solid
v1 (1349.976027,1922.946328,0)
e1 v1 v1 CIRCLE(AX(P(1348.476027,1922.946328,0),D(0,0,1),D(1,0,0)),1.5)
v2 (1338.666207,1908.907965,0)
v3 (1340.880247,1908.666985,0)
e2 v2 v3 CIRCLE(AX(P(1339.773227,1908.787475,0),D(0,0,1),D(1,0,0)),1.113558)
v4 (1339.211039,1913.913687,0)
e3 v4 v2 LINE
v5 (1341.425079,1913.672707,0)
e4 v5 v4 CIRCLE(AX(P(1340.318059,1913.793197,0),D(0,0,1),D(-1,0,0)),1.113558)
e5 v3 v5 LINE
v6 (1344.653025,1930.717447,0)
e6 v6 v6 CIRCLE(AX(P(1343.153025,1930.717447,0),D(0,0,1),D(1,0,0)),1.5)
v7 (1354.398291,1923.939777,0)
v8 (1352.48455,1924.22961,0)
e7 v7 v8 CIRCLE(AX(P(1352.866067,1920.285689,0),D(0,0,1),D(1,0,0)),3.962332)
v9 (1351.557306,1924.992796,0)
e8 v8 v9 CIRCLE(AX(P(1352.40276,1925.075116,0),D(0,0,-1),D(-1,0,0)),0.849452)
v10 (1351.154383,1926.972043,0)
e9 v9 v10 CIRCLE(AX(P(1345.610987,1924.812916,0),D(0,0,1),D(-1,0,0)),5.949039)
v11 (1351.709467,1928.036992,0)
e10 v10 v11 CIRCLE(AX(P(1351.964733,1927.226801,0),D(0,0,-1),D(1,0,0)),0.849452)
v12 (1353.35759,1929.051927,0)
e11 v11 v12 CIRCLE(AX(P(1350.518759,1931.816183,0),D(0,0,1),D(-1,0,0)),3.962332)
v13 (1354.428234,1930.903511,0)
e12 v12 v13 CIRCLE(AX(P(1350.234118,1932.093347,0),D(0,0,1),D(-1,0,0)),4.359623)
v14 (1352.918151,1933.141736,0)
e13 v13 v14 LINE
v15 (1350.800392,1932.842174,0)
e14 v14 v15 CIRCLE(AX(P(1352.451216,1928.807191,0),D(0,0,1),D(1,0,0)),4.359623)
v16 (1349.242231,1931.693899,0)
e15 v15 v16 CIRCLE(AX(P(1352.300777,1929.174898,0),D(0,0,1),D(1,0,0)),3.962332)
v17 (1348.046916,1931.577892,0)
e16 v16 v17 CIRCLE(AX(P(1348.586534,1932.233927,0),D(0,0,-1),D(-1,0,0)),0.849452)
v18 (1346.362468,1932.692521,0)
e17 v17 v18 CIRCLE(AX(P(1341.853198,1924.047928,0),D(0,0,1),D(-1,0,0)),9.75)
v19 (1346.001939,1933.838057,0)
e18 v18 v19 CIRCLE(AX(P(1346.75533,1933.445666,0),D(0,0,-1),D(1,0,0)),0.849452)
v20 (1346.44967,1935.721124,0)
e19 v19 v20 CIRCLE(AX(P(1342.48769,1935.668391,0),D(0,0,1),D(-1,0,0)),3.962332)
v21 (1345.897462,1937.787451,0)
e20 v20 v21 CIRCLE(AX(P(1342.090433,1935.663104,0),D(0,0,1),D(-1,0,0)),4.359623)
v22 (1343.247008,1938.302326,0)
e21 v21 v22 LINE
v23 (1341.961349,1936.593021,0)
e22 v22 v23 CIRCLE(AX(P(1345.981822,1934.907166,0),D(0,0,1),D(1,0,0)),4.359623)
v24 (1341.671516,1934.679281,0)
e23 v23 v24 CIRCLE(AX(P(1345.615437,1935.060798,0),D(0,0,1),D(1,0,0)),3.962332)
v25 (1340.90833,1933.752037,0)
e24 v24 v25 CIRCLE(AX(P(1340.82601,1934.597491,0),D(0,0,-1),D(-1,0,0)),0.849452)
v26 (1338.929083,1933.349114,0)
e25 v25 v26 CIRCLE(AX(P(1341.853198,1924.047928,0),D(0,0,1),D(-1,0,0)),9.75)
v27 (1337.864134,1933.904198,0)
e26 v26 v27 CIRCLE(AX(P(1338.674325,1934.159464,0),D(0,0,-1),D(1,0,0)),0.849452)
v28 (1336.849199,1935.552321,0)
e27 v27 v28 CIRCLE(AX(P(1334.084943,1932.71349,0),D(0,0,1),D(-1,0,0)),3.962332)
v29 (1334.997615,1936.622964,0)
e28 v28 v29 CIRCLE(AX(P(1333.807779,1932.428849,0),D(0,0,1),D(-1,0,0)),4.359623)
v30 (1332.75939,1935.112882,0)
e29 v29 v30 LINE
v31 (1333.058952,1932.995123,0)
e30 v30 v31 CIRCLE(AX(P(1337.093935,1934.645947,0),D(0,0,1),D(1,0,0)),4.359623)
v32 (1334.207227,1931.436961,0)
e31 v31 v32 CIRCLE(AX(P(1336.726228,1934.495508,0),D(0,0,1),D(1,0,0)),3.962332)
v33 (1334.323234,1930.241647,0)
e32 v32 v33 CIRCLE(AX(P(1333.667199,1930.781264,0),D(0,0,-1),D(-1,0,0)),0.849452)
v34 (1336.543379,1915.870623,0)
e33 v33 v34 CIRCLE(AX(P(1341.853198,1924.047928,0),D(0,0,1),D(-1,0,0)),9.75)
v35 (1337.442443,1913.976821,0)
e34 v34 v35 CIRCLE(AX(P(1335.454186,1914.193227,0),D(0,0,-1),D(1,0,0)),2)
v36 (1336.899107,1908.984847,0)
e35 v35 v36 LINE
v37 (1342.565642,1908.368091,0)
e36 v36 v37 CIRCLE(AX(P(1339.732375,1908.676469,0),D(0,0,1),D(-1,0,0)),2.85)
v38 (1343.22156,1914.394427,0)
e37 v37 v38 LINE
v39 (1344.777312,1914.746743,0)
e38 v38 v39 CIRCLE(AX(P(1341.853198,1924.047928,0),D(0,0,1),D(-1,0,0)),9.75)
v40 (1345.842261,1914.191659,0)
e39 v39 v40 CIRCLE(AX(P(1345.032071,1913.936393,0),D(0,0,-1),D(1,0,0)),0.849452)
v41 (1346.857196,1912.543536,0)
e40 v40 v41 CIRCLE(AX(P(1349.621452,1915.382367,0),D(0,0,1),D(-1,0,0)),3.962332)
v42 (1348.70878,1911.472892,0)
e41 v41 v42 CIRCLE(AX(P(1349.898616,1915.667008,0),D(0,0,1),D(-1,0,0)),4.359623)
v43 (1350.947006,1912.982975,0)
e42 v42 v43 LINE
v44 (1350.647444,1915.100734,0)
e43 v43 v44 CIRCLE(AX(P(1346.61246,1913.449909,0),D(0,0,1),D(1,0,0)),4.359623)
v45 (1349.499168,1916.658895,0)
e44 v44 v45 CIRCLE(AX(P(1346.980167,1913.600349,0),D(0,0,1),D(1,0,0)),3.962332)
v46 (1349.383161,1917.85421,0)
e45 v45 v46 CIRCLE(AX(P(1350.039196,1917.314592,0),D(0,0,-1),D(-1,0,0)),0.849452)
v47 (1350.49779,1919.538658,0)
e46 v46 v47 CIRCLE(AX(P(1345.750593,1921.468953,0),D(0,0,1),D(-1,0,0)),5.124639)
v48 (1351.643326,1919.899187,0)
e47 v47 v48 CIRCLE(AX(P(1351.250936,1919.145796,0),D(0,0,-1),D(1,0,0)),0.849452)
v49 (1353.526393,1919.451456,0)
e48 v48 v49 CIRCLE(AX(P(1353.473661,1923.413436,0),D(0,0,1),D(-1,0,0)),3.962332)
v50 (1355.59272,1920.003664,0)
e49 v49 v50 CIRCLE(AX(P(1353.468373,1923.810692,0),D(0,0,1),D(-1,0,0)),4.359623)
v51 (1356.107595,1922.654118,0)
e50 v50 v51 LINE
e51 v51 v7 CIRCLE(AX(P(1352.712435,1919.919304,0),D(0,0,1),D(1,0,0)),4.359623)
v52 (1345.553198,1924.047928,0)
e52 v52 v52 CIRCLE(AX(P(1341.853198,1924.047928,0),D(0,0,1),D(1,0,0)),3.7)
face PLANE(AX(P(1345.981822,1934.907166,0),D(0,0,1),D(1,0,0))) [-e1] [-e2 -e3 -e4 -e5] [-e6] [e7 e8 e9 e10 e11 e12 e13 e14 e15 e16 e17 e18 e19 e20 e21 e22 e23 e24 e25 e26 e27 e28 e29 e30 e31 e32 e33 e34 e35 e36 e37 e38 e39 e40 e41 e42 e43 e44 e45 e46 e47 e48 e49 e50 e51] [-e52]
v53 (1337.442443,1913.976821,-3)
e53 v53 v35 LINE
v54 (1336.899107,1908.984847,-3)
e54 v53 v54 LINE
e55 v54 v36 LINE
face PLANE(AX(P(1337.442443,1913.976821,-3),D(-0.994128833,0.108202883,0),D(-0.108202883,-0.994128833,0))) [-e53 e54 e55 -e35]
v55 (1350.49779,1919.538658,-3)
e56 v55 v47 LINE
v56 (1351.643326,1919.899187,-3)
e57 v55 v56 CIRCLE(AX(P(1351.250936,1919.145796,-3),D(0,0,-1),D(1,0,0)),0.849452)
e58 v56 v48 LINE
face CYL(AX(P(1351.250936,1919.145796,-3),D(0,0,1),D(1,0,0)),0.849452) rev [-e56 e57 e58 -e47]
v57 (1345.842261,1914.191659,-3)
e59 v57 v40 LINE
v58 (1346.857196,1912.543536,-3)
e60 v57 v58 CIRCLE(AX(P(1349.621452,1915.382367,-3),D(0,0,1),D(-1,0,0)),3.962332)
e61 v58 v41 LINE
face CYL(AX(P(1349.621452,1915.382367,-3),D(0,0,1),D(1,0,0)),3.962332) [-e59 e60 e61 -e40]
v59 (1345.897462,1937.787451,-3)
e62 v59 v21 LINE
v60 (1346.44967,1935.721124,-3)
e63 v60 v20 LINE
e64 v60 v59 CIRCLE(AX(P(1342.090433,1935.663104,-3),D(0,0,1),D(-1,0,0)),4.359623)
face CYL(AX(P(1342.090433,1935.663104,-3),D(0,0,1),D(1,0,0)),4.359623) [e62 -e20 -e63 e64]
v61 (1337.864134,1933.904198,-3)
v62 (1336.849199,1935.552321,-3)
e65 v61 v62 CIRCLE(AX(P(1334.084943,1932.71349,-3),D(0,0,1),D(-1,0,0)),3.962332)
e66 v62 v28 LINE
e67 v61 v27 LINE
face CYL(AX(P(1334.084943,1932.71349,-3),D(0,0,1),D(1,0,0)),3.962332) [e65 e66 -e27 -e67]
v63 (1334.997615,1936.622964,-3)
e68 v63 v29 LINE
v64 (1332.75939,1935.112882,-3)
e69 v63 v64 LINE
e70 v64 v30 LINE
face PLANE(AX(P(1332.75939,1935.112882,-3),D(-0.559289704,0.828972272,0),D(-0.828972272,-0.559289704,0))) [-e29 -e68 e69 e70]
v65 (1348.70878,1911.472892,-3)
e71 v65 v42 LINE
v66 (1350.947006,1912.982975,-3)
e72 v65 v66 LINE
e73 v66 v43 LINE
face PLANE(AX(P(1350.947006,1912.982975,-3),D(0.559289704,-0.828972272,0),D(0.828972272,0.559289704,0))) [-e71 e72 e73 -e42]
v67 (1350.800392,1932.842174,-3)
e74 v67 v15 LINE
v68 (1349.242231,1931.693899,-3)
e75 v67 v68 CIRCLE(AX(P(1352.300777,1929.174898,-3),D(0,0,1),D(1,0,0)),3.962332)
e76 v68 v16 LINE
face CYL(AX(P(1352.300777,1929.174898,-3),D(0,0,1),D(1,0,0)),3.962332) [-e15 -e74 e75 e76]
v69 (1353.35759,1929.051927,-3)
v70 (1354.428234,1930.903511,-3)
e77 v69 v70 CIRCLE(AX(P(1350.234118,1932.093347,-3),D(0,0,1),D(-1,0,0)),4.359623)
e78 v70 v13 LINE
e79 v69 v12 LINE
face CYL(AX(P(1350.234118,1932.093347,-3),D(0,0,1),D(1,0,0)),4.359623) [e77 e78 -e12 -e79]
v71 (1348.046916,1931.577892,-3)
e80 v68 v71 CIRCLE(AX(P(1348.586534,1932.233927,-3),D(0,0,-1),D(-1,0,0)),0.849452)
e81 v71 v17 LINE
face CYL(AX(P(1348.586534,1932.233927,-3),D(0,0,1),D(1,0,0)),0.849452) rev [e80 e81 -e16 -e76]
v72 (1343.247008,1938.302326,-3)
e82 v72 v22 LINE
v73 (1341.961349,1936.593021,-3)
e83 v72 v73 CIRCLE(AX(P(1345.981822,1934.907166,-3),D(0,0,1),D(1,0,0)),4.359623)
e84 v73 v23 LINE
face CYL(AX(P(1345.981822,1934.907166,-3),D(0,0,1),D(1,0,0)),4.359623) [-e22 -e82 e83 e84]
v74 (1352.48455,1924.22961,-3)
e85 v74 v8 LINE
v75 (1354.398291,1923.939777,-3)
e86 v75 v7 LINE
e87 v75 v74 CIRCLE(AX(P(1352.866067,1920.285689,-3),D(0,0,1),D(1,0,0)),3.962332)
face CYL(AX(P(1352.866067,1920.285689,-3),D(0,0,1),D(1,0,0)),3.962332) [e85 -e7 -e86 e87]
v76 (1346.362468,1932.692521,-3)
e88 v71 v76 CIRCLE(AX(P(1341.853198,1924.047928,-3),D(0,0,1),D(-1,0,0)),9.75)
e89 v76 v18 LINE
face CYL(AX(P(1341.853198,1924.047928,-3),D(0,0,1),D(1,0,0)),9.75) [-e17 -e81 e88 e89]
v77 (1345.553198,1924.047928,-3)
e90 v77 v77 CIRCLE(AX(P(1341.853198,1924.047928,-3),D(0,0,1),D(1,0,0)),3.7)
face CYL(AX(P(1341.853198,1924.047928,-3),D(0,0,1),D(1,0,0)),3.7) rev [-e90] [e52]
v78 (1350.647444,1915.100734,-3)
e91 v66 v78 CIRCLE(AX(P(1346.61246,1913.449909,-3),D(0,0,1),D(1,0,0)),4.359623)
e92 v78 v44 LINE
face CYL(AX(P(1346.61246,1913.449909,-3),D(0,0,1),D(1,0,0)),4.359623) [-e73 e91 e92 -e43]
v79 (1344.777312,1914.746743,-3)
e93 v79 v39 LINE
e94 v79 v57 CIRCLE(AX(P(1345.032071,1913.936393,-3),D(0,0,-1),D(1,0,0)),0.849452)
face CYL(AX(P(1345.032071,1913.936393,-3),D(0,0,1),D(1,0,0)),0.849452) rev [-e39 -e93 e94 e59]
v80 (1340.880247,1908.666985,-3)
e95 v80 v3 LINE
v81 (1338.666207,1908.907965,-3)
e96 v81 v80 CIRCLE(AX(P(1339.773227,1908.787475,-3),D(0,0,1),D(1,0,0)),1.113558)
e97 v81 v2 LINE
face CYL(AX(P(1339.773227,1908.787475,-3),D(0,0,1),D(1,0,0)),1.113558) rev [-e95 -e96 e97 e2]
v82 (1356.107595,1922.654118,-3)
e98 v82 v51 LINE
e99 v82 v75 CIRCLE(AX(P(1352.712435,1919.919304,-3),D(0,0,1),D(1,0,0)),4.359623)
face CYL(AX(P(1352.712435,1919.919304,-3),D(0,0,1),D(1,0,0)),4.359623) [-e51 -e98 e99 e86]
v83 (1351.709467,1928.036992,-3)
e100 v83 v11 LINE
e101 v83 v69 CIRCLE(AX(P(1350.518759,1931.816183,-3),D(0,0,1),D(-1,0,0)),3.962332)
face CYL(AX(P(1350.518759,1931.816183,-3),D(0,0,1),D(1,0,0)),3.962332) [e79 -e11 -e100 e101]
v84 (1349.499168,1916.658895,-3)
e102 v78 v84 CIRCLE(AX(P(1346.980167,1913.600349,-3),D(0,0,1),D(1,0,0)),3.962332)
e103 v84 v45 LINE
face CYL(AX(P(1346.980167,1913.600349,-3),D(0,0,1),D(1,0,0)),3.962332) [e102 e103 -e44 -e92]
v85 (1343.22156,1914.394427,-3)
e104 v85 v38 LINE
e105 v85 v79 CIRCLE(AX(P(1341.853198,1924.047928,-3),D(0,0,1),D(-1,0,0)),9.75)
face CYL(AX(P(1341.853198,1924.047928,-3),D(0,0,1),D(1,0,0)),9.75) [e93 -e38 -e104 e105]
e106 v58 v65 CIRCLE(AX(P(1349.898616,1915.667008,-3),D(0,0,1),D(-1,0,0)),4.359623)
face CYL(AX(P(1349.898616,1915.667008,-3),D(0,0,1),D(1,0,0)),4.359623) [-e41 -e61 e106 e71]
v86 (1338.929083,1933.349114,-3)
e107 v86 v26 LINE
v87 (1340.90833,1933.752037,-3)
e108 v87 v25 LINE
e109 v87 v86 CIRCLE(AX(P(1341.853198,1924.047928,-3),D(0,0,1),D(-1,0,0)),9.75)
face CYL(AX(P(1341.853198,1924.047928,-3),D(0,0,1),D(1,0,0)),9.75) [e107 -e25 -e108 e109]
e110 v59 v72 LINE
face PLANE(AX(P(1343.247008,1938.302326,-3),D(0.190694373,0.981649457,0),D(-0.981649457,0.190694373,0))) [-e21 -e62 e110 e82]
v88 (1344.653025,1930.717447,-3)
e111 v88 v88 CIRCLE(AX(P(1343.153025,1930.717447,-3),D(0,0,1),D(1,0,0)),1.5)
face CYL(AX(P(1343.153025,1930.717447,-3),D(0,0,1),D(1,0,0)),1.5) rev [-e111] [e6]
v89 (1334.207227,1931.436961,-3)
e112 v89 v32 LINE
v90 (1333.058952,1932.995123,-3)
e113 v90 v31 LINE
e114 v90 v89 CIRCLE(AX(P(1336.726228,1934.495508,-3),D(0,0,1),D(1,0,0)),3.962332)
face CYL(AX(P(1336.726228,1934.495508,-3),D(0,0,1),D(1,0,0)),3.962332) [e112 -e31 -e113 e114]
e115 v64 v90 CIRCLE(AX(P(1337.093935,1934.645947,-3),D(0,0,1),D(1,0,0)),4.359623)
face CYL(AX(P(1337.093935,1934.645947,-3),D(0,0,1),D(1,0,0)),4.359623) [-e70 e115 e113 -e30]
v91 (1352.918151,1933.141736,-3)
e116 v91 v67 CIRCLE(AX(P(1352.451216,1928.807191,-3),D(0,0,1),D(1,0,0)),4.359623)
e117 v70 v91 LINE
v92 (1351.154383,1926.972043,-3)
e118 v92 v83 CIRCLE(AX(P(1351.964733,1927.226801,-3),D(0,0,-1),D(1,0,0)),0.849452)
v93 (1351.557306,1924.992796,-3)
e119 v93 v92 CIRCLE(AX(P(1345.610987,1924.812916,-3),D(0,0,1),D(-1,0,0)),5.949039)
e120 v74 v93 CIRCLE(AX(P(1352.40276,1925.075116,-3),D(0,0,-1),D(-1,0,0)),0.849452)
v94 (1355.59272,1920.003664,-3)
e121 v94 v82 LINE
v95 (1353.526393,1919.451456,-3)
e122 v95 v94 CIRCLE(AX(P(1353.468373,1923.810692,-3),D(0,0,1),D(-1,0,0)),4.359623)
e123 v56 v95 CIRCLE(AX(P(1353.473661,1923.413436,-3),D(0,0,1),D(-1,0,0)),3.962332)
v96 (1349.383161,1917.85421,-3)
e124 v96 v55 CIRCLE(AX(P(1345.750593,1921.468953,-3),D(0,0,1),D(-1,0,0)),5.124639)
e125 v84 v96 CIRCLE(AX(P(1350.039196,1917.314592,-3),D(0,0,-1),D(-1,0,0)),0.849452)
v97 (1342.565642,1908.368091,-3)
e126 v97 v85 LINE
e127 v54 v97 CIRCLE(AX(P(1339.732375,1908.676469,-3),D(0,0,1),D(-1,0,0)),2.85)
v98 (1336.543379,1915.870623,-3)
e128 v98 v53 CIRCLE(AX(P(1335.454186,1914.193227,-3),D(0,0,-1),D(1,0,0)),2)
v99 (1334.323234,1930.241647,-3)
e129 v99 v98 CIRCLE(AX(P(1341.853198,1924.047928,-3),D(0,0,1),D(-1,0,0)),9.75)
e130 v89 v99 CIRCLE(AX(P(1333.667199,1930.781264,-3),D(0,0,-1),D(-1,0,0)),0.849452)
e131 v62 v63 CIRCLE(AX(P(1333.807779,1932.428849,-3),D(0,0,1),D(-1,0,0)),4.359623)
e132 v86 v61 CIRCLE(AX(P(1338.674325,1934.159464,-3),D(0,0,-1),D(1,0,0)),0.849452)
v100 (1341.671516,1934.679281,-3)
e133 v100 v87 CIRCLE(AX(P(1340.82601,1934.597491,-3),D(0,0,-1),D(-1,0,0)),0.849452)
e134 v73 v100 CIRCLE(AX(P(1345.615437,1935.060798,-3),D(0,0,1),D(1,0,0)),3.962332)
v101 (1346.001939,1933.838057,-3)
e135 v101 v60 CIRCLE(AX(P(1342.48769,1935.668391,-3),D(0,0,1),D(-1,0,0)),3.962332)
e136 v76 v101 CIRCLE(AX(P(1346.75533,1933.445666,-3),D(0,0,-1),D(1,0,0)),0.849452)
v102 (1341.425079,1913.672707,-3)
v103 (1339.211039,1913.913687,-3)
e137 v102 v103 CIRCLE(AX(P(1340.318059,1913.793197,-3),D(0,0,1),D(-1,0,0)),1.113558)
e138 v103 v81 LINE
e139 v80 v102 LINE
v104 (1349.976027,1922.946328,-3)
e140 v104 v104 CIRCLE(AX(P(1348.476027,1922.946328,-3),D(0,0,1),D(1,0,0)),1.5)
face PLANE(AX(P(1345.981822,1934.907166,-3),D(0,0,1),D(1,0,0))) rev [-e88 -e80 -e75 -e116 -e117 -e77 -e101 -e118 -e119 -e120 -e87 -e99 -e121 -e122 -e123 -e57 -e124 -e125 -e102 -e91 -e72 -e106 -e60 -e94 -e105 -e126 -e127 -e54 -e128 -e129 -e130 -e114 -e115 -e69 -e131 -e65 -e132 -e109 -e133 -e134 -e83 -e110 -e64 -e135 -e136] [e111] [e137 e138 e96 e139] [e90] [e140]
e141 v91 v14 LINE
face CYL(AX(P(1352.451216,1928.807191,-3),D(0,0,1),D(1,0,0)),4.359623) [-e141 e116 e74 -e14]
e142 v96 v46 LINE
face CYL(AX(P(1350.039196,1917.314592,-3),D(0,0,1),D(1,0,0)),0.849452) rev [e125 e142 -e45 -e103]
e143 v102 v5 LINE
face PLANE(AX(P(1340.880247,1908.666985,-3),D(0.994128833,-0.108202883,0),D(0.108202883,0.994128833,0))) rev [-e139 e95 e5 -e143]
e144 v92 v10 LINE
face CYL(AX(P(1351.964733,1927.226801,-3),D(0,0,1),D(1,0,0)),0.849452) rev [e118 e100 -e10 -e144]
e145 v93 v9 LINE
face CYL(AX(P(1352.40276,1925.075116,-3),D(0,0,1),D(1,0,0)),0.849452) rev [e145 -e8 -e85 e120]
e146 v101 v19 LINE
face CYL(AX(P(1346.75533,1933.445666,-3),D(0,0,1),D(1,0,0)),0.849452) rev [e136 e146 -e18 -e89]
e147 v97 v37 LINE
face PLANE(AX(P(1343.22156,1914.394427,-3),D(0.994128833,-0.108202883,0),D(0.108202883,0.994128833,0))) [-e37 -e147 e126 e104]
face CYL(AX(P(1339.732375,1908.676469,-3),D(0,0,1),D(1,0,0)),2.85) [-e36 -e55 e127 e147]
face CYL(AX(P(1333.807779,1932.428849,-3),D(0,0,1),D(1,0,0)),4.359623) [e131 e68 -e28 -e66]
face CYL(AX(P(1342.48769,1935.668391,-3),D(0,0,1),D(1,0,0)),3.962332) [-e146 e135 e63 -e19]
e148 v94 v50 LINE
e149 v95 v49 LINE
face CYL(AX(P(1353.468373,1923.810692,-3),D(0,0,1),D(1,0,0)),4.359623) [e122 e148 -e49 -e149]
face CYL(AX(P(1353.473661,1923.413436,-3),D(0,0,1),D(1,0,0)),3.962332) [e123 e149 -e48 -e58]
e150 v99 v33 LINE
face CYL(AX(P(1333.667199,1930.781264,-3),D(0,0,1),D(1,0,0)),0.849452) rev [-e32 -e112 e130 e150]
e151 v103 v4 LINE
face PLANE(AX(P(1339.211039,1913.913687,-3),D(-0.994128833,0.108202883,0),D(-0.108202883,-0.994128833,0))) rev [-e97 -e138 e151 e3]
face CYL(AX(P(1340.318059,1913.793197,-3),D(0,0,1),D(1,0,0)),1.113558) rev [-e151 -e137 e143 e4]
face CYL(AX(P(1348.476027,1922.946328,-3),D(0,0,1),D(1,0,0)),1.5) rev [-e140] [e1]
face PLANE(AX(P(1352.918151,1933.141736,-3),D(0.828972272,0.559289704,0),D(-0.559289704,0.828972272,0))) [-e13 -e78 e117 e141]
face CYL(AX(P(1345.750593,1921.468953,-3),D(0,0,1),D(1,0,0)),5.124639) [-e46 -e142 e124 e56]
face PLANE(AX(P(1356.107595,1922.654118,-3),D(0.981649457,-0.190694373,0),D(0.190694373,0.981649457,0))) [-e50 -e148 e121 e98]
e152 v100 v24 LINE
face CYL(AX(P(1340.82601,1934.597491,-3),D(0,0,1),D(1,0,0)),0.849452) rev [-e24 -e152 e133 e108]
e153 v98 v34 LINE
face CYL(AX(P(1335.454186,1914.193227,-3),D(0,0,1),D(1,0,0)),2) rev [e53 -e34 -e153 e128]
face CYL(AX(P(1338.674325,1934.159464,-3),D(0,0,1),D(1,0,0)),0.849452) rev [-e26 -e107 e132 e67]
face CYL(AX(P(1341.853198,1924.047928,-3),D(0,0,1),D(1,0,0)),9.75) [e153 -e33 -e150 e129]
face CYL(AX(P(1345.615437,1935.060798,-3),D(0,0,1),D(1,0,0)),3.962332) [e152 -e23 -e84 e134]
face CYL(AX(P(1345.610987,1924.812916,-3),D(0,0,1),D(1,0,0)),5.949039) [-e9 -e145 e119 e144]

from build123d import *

# Parameters (mm, degrees)
ESQUISSE1_R               = 3.7
ESQUISSE1_R_2             = 1.5
T_LE_DE_BASE_PLI_E1_DEPTH = 3


# Sheet-metal steps are written as plain solids
with BuildPart() as part:
    # Esquisse1 → Tôle de base pliée1 (new body)
    with BuildSketch(Plane.XY):
        with BuildLine():
            Line((1343.247008076, 1938.302325501), (1345.89746161, 1937.787450694))
            ThreePointArc((1345.89746161, 1937.787450694), (1346.302249899, 1936.788677026), (1346.449670341, 1935.72112393))
            ThreePointArc((1346.449670341, 1935.72112393), (1346.342555269, 1934.751830987), (1346.001938932, 1933.838056967))
            ThreePointArc((1346.001938932, 1933.838056967), (1345.945060229, 1933.190654063), (1346.362467863, 1932.692520976))
            ThreePointArc((1346.362467863, 1932.692520976), (1347.233633787, 1932.178943437), (1348.046916436, 1931.57789162))
            ThreePointArc((1348.046916436, 1931.57789162), (1348.668588775, 1931.388447146), (1349.242230693, 1931.693898708))
            ThreePointArc((1349.242230693, 1931.693898708), (1349.950118086, 1932.364642987), (1350.800392256, 1932.842174436))
            ThreePointArc((1350.800392256, 1932.842174436), (1351.840616067, 1933.123842365), (1352.918151311, 1933.141736383))
            Line((1352.918151311, 1933.141736383), (1354.428233511, 1930.903511249))
            ThreePointArc((1354.428233511, 1930.903511249), (1354.008222422, 1929.911043071), (1353.357590382, 1929.051927044))
            ThreePointArc((1353.357590382, 1929.051927044), (1352.596454976, 1928.442275224), (1351.709467048, 1928.03699154))
            ThreePointArc((1351.709467048, 1928.03699154), (1351.211464748, 1927.619427873), (1351.154383232, 1926.97204282))
            ThreePointArc((1351.154383232, 1926.97204282), (1351.440459119, 1925.999644606), (1351.557306264, 1924.992795836))
            ThreePointArc((1351.557306264, 1924.992795836), (1351.862937519, 1924.419249637), (1352.48455048, 1924.229610418))
            ThreePointArc((1352.48455048, 1924.229610418), (1353.459390284, 1924.203346271), (1354.398290641, 1923.939777365))
            ThreePointArc((1354.398290641, 1923.939777365), (1355.333009255, 1923.403397357), (1356.107594714, 1922.65411786))
            Line((1356.107594714, 1922.65411786), (1355.592719908, 1920.003664327))
            ThreePointArc((1355.592719908, 1920.003664327), (1354.59394624, 1919.598876037), (1353.526393144, 1919.451455596))
            ThreePointArc((1353.526393144, 1919.451455596), (1352.557100201, 1919.558570667), (1351.643326181, 1919.899187005))
            ThreePointArc((1351.643326181, 1919.899187005), (1350.995923277, 1919.956065707), (1350.497790189, 1919.538658073))
            ThreePointArc((1350.497790189, 1919.538658073), (1350.024286618, 1918.640974498), (1349.383160833, 1917.854209501))
            ThreePointArc((1349.383160833, 1917.854209501), (1349.19371636, 1917.232537161), (1349.499167922, 1916.658895244))
            ThreePointArc((1349.499167922, 1916.658895244), (1350.169912201, 1915.951007851), (1350.64744365, 1915.100733681))
            ThreePointArc((1350.64744365, 1915.100733681), (1350.929111579, 1914.06050987), (1350.947005597, 1912.982974625))
            Line((1350.947005597, 1912.982974625), (1348.708780463, 1911.472892426))
            ThreePointArc((1348.708780463, 1911.472892426), (1347.716312285, 1911.892903515), (1346.857196258, 1912.543535554))
            ThreePointArc((1346.857196258, 1912.543535554), (1346.247544438, 1913.304670961), (1345.842260754, 1914.191658889))
            ThreePointArc((1345.842260754, 1914.191658889), (1345.424697087, 1914.689661189), (1344.777312034, 1914.746742704))
            ThreePointArc((1344.777312034, 1914.746742704), (1344.006653047, 1914.538715485), (1343.221559749, 1914.394427185))
            Line((1343.221559749, 1914.394427185), (1342.565641761, 1908.368090699))
            ThreePointArc((1342.565641761, 1908.368090699), (1339.42399637, 1905.843201744), (1336.899107414, 1908.984847135))
            Line((1336.899107414, 1908.984847135), (1337.442443377, 1913.976820816))
            ThreePointArc((1337.442443377, 1913.976820816), (1337.260922483, 1915.05095745), (1336.54337922, 1915.870622631))
            ThreePointArc((1336.54337922, 1915.870622631), (1332.217504298, 1922.559333364), (1334.323234317, 1930.241647222))
            ThreePointArc((1334.323234317, 1930.241647222), (1334.51267879, 1930.863319562), (1334.207227229, 1931.436961479))
            ThreePointArc((1334.207227229, 1931.436961479), (1333.536482949, 1932.144848872), (1333.0589515, 1932.995123042))
            ThreePointArc((1333.0589515, 1932.995123042), (1332.777283571, 1934.035346853), (1332.759389553, 1935.112882097))
            Line((1332.759389553, 1935.112882097), (1334.997614687, 1936.622964297))
            ThreePointArc((1334.997614687, 1936.622964297), (1335.990082865, 1936.202953208), (1336.849198892, 1935.552321168))
            ThreePointArc((1336.849198892, 1935.552321168), (1337.458850712, 1934.791185762), (1337.864134396, 1933.904197834))
            ThreePointArc((1337.864134396, 1933.904197834), (1338.281698063, 1933.406195534), (1338.929083116, 1933.349114018))
            ThreePointArc((1338.929083116, 1933.349114018), (1339.908244608, 1933.601967191), (1340.9083301, 1933.752037051))
            ThreePointArc((1340.9083301, 1933.752037051), (1341.481876299, 1934.057668306), (1341.671515518, 1934.679281266))
            ThreePointArc((1341.671515518, 1934.679281266), (1341.697779666, 1935.65412107), (1341.961348571, 1936.593021428))
            ThreePointArc((1341.961348571, 1936.593021428), (1342.497728579, 1937.527740041), (1343.247008076, 1938.302325501))
        make_face()
        with Locations((1341.853197575, 1924.047928361)):
            Circle(ESQUISSE1_R, mode=Mode.SUBTRACT)
        with Locations((1343.153024926, 1930.717446866)):
            Circle(ESQUISSE1_R_2, mode=Mode.SUBTRACT)
        with Locations((1348.476026591, 1922.946328291)):
            Circle(ESQUISSE1_R_2, mode=Mode.SUBTRACT)
        with BuildLine():
            Line((1340.880246952, 1908.666985015), (1341.425079269, 1913.672706653))
            ThreePointArc((1341.425079269, 1913.672706653), (1340.438549544, 1914.900216702), (1339.211039495, 1913.913686977))
            Line((1339.211039495, 1913.913686977), (1338.666207179, 1908.907965339))
            ThreePointArc((1338.666207179, 1908.907965339), (1339.652736904, 1907.68045529), (1340.880246952, 1908.666985015))
        make_face(mode=Mode.SUBTRACT)
    extrude(amount=-T_LE_DE_BASE_PLI_E1_DEPTH)


solid = part.part
